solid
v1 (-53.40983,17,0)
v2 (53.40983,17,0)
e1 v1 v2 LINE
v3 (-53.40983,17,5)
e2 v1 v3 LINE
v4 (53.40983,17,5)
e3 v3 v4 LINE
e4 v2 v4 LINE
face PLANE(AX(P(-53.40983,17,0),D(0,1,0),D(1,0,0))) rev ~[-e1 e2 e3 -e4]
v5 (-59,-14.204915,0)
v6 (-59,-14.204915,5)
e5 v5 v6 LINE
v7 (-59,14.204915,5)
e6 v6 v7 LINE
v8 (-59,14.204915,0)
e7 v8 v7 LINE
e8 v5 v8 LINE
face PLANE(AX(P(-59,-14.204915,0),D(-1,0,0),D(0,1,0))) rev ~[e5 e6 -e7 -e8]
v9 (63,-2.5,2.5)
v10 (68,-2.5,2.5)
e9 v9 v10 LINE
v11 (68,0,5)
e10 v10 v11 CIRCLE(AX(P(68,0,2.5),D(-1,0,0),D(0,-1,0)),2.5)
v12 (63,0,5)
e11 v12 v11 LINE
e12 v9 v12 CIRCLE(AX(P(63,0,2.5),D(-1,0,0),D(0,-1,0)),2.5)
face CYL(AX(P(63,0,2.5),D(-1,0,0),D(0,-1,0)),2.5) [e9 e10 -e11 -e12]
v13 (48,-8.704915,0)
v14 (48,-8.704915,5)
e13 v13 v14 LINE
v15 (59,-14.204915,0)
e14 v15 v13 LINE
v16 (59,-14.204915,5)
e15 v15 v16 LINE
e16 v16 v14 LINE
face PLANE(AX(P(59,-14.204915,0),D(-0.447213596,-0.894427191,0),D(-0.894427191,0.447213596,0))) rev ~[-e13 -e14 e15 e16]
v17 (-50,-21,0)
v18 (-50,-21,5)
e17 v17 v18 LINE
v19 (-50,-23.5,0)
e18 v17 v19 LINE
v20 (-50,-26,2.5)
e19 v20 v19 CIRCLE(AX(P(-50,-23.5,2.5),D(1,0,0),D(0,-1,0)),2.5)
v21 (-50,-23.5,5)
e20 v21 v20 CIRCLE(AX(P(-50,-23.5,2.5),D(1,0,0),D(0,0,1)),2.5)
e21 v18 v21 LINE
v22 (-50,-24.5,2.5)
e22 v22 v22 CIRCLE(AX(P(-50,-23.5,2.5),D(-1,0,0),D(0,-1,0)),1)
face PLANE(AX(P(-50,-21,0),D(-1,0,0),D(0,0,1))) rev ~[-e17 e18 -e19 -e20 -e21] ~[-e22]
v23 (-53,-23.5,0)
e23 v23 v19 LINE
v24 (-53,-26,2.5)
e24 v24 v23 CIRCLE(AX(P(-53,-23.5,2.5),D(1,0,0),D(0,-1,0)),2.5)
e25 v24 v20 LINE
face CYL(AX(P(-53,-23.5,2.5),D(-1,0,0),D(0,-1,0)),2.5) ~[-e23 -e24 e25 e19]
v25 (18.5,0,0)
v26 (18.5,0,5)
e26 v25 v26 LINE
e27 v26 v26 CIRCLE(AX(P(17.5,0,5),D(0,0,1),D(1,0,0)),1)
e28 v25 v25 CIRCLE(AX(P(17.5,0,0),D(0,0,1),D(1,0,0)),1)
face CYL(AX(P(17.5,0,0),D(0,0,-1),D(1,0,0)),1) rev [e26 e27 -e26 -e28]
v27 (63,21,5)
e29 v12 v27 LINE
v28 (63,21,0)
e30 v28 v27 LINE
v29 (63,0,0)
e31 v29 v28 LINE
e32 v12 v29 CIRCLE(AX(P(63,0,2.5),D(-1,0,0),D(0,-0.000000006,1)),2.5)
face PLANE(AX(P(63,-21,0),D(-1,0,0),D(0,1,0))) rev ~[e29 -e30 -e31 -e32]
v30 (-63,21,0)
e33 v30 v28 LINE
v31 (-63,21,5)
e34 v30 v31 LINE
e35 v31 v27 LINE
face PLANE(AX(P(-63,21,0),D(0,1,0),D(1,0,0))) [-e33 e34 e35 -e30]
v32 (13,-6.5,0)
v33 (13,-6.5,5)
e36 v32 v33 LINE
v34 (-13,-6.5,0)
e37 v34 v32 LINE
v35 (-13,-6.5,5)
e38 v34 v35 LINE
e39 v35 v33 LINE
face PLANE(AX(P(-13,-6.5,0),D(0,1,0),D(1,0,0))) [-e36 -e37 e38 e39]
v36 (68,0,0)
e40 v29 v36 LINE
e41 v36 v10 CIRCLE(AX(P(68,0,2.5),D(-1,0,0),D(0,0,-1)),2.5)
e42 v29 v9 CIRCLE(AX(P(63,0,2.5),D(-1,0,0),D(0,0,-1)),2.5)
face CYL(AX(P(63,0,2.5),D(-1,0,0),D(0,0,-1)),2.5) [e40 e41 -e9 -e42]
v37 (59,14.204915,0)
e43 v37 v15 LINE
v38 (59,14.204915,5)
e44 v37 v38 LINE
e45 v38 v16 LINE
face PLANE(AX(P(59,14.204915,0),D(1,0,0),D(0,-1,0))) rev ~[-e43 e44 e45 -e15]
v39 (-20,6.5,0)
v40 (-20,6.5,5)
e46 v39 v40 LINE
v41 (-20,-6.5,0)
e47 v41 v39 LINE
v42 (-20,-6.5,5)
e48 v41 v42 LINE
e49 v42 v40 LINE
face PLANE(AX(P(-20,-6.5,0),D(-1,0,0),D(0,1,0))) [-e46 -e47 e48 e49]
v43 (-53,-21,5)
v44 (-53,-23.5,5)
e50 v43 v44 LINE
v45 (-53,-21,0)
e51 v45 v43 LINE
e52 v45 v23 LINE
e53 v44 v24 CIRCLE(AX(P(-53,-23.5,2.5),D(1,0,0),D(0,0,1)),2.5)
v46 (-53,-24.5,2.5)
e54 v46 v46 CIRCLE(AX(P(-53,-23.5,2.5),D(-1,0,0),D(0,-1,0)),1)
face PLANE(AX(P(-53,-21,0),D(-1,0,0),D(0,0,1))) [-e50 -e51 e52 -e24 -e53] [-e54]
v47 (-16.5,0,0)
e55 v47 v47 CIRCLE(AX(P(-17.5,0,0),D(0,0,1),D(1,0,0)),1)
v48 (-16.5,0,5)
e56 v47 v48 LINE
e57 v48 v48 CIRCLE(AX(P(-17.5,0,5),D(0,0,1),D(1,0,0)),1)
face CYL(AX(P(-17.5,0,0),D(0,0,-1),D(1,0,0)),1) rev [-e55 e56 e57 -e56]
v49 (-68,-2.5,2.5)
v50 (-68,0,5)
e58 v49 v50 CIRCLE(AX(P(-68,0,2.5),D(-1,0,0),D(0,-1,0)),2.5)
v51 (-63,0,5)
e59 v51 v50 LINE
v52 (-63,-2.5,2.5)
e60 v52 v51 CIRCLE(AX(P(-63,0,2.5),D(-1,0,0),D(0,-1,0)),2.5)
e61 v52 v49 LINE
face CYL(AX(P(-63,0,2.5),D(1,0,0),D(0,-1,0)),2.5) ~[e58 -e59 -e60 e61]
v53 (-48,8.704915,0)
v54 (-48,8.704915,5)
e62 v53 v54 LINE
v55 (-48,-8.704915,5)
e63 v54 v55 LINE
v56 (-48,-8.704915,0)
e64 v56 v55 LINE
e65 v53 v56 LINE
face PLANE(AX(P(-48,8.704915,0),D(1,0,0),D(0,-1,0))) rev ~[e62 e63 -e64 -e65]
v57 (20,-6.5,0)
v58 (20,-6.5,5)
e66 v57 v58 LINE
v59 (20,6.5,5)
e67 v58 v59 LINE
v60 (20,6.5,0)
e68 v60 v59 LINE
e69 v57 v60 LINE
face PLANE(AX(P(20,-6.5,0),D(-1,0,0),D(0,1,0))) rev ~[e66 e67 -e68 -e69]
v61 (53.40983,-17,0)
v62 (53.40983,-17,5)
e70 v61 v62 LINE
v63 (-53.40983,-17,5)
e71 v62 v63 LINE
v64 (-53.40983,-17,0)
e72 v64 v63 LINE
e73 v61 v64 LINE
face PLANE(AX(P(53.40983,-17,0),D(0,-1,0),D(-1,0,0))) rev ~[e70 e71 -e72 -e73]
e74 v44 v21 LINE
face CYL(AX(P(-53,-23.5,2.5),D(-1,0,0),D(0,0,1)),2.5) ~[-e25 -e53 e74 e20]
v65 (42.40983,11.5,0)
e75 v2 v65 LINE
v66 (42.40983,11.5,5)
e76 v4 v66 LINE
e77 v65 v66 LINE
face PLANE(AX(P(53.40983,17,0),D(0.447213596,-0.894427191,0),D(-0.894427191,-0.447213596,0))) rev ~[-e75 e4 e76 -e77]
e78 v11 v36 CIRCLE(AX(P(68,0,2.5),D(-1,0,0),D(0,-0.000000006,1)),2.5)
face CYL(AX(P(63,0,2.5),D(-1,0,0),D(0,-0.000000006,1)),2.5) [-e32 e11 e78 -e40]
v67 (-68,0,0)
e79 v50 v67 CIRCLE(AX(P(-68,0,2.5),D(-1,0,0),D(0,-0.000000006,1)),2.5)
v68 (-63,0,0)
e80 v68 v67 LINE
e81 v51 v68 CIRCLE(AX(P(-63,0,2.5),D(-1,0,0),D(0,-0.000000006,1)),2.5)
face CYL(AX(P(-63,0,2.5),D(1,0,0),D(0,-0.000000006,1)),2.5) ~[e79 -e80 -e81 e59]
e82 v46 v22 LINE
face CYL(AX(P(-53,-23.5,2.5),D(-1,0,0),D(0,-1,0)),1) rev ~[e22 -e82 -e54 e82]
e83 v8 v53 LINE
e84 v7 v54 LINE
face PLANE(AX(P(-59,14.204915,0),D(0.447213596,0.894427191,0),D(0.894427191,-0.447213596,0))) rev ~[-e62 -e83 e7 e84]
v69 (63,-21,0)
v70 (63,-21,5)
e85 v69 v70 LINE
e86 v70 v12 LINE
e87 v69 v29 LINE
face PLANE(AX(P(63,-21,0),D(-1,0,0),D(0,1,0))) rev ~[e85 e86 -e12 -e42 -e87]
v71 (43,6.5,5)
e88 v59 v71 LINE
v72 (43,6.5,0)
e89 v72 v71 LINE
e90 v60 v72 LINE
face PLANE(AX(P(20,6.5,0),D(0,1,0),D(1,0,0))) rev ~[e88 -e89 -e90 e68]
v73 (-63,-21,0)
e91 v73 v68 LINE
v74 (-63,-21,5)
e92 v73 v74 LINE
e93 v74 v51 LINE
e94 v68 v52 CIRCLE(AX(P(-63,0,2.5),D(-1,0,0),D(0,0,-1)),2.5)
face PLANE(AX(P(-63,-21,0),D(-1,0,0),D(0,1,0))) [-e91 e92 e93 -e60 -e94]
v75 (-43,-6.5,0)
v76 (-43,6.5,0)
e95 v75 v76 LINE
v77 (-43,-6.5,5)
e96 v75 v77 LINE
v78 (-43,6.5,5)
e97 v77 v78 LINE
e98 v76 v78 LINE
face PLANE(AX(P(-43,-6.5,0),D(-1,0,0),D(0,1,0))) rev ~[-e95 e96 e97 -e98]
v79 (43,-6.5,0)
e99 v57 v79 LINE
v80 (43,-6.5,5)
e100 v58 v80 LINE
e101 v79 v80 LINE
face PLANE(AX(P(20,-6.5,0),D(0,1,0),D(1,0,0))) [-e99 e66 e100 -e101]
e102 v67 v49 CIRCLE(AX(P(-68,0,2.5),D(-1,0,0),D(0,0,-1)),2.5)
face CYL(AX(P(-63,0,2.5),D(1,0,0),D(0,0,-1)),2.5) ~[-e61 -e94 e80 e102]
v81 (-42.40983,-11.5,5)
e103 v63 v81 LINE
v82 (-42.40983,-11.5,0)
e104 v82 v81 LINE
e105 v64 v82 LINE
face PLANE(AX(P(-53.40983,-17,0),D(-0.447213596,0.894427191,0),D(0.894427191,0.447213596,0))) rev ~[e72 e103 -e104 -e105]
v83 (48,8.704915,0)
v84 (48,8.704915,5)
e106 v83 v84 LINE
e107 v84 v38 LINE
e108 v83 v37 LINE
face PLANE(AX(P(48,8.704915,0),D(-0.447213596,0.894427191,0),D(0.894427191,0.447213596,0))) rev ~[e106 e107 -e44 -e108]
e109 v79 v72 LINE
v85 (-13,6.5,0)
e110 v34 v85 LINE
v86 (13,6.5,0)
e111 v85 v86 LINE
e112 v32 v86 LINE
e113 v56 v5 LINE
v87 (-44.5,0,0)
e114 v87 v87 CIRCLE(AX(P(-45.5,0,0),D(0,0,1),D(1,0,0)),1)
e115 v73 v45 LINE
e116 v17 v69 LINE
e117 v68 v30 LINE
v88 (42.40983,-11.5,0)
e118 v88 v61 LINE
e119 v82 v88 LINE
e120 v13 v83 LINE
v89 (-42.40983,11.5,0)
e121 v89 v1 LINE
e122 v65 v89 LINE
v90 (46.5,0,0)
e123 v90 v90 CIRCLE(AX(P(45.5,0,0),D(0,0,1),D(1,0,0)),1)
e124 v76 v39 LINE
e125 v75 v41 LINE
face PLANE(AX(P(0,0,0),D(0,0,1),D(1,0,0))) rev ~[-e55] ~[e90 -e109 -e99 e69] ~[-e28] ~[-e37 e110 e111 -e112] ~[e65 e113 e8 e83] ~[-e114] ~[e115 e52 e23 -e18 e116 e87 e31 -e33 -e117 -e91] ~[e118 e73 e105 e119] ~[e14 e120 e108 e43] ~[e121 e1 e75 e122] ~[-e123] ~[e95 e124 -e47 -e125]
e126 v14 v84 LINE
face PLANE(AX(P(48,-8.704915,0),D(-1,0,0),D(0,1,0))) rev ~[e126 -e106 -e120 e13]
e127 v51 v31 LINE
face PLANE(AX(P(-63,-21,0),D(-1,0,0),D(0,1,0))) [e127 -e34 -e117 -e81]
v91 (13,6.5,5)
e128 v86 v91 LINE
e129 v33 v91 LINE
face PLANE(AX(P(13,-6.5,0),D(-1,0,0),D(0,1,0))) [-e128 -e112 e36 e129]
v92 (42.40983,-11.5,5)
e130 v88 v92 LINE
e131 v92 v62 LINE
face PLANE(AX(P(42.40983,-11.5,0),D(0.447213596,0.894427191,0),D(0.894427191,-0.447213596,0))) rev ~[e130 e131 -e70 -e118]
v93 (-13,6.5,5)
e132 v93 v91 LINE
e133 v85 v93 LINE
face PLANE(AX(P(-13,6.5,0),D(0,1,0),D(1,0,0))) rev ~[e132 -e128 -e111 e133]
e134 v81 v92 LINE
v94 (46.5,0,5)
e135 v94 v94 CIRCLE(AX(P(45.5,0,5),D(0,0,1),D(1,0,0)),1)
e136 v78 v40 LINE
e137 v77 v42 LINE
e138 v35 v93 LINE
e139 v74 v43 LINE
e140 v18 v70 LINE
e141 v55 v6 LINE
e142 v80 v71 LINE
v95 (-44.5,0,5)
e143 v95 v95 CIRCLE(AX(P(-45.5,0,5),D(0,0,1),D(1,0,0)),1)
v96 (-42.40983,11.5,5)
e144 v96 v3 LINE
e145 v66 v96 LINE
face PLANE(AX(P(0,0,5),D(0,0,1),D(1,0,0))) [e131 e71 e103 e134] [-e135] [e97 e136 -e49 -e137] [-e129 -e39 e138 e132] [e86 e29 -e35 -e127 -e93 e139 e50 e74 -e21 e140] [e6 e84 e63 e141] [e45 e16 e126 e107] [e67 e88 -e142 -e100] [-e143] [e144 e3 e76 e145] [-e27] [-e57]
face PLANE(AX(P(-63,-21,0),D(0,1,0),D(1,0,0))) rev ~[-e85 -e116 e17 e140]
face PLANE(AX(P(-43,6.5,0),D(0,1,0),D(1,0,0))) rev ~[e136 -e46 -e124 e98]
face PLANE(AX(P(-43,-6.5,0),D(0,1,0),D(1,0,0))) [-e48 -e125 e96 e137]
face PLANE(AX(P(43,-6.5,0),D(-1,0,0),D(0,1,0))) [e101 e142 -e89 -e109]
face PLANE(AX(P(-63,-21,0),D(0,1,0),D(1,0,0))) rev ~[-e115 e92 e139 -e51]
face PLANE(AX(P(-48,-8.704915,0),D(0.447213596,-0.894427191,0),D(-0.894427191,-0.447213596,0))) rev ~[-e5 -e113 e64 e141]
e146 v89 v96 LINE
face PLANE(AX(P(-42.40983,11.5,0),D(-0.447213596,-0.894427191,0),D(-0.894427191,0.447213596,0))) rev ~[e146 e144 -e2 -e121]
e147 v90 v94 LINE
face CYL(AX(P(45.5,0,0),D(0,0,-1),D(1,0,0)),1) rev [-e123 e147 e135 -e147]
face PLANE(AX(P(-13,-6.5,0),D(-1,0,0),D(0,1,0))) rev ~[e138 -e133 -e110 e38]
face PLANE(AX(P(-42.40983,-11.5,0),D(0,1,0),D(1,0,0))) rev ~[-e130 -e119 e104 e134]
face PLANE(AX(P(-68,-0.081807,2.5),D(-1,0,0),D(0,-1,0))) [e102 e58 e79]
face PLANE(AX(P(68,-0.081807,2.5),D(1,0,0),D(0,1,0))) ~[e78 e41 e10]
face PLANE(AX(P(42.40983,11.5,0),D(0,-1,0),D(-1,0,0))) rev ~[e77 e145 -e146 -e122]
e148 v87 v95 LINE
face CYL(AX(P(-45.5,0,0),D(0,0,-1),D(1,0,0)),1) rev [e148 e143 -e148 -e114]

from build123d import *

# Parameters (mm, degrees)
F0_W     = 126
F0_H     = 42
F0_R     = 1
F0_W_2   = 23
F0_H_2   = 13
F0_W_3   = 26
F1_DEPTH = 5
F3_DEPTH = 5
F4_W     = 3
F4_H     = 5
F5_DEPTH = 5
F6_R     = 1
F7_DEPTH = 3


# Not quite as in the source:
# - a pattern or mirror of a feature is missing from the dataset's text; its kind, count and spacing are read off the source's solid


with BuildPart() as f1:
    # F0 (on Top) → F1 (new body)
    with BuildSketch(Plane.XY):
        Rectangle(F0_W, F0_H)
        Polygon((-7, -11.5), (7, -11.5), (42.4098300563, -11.5), (53.4098300563, -17), (-53.4098300563, -17), (-42.4098300563, -11.5), align=None, mode=Mode.SUBTRACT)
        Polygon((-59, 14.2049150281), (-48, 8.7049150281), (-48, -8.7049150281), (-59, -14.2049150281), align=None, mode=Mode.SUBTRACT)
        with Locations((-45.5, 0)):
            Circle(F0_R, mode=Mode.SUBTRACT)
        with Locations((-31.5, 0)):
            Rectangle(F0_W_2, F0_H_2, mode=Mode.SUBTRACT)
        with Locations((-17.5, 0)):
            Circle(F0_R, mode=Mode.SUBTRACT)
        Rectangle(F0_W_3, F0_H_2, mode=Mode.SUBTRACT)
        with Locations((17.5, 0)):
            Circle(F0_R, mode=Mode.SUBTRACT)
        with Locations((31.5, 0)):
            Rectangle(F0_W_2, F0_H_2, mode=Mode.SUBTRACT)
        with Locations((45.5, 0)):
            Circle(F0_R, mode=Mode.SUBTRACT)
        Polygon((48, -8.7049150281), (48, 8.7049150281), (59, 14.2049150281), (59, -14.2049150281), align=None, mode=Mode.SUBTRACT)
        Polygon((42.4098300563, 11.5), (7, 11.5), (-7, 11.5), (-42.4098300563, 11.5), (-53.4098300563, 17), (53.4098300563, 17), align=None, mode=Mode.SUBTRACT)
    extrude(amount=F1_DEPTH)

    # F2 (on face) → F3 (join)
    with BuildSketch(Plane(origin=(-63, 0, 0), x_dir=(0, -1, 0), z_dir=(-1, 0, 0))):
        with BuildLine():
            ThreePointArc((0, 0), (1.767766953, 0.732233047), (2.5, 2.5))
            ThreePointArc((2.5, 2.5), (1.7677669583, 4.2677669477), (1.5e-08, 5))
            ThreePointArc((1.5e-08, 5), (-2.5, 2.5000000075), (0, 0))
        make_face()
    f3 = extrude(amount=F3_DEPTH)

    # F3_copies: F3 across plane
    add(f3.mirror(Plane(origin=(0, 0, 0), x_dir=(0, 0, 1), z_dir=(1, 0, 0))))

    # F4 (on face) → F5 (join)
    with BuildSketch(Plane.XZ.offset(21)):
        with Locations((-51.5, 2.5)):
            Rectangle(F4_W, F4_H)
    extrude(amount=F5_DEPTH)

    # F6 (on face) → F7 (cut, through all)
    with BuildSketch(Plane(origin=(-53, 0, 0), x_dir=(0, -1, 0), z_dir=(-1, 0, 0))):
        with Locations((23.5, 2.5)):
            Circle(F6_R)
        with BuildLine():
            Line((26, 2.5), (26, 5))
            Line((26, 5), (23.5, 5))
            ThreePointArc((23.5, 5), (25.267766953, 4.267766953), (26, 2.5))
        make_face()
        with BuildLine():
            Line((26, 0), (26, 2.5))
            ThreePointArc((26, 2.5), (25.267766953, 0.732233047), (23.5, 0))
            Line((23.5, 0), (26, 0))
        make_face()
    extrude(amount=-F7_DEPTH, mode=Mode.SUBTRACT)


solid = f1.part
